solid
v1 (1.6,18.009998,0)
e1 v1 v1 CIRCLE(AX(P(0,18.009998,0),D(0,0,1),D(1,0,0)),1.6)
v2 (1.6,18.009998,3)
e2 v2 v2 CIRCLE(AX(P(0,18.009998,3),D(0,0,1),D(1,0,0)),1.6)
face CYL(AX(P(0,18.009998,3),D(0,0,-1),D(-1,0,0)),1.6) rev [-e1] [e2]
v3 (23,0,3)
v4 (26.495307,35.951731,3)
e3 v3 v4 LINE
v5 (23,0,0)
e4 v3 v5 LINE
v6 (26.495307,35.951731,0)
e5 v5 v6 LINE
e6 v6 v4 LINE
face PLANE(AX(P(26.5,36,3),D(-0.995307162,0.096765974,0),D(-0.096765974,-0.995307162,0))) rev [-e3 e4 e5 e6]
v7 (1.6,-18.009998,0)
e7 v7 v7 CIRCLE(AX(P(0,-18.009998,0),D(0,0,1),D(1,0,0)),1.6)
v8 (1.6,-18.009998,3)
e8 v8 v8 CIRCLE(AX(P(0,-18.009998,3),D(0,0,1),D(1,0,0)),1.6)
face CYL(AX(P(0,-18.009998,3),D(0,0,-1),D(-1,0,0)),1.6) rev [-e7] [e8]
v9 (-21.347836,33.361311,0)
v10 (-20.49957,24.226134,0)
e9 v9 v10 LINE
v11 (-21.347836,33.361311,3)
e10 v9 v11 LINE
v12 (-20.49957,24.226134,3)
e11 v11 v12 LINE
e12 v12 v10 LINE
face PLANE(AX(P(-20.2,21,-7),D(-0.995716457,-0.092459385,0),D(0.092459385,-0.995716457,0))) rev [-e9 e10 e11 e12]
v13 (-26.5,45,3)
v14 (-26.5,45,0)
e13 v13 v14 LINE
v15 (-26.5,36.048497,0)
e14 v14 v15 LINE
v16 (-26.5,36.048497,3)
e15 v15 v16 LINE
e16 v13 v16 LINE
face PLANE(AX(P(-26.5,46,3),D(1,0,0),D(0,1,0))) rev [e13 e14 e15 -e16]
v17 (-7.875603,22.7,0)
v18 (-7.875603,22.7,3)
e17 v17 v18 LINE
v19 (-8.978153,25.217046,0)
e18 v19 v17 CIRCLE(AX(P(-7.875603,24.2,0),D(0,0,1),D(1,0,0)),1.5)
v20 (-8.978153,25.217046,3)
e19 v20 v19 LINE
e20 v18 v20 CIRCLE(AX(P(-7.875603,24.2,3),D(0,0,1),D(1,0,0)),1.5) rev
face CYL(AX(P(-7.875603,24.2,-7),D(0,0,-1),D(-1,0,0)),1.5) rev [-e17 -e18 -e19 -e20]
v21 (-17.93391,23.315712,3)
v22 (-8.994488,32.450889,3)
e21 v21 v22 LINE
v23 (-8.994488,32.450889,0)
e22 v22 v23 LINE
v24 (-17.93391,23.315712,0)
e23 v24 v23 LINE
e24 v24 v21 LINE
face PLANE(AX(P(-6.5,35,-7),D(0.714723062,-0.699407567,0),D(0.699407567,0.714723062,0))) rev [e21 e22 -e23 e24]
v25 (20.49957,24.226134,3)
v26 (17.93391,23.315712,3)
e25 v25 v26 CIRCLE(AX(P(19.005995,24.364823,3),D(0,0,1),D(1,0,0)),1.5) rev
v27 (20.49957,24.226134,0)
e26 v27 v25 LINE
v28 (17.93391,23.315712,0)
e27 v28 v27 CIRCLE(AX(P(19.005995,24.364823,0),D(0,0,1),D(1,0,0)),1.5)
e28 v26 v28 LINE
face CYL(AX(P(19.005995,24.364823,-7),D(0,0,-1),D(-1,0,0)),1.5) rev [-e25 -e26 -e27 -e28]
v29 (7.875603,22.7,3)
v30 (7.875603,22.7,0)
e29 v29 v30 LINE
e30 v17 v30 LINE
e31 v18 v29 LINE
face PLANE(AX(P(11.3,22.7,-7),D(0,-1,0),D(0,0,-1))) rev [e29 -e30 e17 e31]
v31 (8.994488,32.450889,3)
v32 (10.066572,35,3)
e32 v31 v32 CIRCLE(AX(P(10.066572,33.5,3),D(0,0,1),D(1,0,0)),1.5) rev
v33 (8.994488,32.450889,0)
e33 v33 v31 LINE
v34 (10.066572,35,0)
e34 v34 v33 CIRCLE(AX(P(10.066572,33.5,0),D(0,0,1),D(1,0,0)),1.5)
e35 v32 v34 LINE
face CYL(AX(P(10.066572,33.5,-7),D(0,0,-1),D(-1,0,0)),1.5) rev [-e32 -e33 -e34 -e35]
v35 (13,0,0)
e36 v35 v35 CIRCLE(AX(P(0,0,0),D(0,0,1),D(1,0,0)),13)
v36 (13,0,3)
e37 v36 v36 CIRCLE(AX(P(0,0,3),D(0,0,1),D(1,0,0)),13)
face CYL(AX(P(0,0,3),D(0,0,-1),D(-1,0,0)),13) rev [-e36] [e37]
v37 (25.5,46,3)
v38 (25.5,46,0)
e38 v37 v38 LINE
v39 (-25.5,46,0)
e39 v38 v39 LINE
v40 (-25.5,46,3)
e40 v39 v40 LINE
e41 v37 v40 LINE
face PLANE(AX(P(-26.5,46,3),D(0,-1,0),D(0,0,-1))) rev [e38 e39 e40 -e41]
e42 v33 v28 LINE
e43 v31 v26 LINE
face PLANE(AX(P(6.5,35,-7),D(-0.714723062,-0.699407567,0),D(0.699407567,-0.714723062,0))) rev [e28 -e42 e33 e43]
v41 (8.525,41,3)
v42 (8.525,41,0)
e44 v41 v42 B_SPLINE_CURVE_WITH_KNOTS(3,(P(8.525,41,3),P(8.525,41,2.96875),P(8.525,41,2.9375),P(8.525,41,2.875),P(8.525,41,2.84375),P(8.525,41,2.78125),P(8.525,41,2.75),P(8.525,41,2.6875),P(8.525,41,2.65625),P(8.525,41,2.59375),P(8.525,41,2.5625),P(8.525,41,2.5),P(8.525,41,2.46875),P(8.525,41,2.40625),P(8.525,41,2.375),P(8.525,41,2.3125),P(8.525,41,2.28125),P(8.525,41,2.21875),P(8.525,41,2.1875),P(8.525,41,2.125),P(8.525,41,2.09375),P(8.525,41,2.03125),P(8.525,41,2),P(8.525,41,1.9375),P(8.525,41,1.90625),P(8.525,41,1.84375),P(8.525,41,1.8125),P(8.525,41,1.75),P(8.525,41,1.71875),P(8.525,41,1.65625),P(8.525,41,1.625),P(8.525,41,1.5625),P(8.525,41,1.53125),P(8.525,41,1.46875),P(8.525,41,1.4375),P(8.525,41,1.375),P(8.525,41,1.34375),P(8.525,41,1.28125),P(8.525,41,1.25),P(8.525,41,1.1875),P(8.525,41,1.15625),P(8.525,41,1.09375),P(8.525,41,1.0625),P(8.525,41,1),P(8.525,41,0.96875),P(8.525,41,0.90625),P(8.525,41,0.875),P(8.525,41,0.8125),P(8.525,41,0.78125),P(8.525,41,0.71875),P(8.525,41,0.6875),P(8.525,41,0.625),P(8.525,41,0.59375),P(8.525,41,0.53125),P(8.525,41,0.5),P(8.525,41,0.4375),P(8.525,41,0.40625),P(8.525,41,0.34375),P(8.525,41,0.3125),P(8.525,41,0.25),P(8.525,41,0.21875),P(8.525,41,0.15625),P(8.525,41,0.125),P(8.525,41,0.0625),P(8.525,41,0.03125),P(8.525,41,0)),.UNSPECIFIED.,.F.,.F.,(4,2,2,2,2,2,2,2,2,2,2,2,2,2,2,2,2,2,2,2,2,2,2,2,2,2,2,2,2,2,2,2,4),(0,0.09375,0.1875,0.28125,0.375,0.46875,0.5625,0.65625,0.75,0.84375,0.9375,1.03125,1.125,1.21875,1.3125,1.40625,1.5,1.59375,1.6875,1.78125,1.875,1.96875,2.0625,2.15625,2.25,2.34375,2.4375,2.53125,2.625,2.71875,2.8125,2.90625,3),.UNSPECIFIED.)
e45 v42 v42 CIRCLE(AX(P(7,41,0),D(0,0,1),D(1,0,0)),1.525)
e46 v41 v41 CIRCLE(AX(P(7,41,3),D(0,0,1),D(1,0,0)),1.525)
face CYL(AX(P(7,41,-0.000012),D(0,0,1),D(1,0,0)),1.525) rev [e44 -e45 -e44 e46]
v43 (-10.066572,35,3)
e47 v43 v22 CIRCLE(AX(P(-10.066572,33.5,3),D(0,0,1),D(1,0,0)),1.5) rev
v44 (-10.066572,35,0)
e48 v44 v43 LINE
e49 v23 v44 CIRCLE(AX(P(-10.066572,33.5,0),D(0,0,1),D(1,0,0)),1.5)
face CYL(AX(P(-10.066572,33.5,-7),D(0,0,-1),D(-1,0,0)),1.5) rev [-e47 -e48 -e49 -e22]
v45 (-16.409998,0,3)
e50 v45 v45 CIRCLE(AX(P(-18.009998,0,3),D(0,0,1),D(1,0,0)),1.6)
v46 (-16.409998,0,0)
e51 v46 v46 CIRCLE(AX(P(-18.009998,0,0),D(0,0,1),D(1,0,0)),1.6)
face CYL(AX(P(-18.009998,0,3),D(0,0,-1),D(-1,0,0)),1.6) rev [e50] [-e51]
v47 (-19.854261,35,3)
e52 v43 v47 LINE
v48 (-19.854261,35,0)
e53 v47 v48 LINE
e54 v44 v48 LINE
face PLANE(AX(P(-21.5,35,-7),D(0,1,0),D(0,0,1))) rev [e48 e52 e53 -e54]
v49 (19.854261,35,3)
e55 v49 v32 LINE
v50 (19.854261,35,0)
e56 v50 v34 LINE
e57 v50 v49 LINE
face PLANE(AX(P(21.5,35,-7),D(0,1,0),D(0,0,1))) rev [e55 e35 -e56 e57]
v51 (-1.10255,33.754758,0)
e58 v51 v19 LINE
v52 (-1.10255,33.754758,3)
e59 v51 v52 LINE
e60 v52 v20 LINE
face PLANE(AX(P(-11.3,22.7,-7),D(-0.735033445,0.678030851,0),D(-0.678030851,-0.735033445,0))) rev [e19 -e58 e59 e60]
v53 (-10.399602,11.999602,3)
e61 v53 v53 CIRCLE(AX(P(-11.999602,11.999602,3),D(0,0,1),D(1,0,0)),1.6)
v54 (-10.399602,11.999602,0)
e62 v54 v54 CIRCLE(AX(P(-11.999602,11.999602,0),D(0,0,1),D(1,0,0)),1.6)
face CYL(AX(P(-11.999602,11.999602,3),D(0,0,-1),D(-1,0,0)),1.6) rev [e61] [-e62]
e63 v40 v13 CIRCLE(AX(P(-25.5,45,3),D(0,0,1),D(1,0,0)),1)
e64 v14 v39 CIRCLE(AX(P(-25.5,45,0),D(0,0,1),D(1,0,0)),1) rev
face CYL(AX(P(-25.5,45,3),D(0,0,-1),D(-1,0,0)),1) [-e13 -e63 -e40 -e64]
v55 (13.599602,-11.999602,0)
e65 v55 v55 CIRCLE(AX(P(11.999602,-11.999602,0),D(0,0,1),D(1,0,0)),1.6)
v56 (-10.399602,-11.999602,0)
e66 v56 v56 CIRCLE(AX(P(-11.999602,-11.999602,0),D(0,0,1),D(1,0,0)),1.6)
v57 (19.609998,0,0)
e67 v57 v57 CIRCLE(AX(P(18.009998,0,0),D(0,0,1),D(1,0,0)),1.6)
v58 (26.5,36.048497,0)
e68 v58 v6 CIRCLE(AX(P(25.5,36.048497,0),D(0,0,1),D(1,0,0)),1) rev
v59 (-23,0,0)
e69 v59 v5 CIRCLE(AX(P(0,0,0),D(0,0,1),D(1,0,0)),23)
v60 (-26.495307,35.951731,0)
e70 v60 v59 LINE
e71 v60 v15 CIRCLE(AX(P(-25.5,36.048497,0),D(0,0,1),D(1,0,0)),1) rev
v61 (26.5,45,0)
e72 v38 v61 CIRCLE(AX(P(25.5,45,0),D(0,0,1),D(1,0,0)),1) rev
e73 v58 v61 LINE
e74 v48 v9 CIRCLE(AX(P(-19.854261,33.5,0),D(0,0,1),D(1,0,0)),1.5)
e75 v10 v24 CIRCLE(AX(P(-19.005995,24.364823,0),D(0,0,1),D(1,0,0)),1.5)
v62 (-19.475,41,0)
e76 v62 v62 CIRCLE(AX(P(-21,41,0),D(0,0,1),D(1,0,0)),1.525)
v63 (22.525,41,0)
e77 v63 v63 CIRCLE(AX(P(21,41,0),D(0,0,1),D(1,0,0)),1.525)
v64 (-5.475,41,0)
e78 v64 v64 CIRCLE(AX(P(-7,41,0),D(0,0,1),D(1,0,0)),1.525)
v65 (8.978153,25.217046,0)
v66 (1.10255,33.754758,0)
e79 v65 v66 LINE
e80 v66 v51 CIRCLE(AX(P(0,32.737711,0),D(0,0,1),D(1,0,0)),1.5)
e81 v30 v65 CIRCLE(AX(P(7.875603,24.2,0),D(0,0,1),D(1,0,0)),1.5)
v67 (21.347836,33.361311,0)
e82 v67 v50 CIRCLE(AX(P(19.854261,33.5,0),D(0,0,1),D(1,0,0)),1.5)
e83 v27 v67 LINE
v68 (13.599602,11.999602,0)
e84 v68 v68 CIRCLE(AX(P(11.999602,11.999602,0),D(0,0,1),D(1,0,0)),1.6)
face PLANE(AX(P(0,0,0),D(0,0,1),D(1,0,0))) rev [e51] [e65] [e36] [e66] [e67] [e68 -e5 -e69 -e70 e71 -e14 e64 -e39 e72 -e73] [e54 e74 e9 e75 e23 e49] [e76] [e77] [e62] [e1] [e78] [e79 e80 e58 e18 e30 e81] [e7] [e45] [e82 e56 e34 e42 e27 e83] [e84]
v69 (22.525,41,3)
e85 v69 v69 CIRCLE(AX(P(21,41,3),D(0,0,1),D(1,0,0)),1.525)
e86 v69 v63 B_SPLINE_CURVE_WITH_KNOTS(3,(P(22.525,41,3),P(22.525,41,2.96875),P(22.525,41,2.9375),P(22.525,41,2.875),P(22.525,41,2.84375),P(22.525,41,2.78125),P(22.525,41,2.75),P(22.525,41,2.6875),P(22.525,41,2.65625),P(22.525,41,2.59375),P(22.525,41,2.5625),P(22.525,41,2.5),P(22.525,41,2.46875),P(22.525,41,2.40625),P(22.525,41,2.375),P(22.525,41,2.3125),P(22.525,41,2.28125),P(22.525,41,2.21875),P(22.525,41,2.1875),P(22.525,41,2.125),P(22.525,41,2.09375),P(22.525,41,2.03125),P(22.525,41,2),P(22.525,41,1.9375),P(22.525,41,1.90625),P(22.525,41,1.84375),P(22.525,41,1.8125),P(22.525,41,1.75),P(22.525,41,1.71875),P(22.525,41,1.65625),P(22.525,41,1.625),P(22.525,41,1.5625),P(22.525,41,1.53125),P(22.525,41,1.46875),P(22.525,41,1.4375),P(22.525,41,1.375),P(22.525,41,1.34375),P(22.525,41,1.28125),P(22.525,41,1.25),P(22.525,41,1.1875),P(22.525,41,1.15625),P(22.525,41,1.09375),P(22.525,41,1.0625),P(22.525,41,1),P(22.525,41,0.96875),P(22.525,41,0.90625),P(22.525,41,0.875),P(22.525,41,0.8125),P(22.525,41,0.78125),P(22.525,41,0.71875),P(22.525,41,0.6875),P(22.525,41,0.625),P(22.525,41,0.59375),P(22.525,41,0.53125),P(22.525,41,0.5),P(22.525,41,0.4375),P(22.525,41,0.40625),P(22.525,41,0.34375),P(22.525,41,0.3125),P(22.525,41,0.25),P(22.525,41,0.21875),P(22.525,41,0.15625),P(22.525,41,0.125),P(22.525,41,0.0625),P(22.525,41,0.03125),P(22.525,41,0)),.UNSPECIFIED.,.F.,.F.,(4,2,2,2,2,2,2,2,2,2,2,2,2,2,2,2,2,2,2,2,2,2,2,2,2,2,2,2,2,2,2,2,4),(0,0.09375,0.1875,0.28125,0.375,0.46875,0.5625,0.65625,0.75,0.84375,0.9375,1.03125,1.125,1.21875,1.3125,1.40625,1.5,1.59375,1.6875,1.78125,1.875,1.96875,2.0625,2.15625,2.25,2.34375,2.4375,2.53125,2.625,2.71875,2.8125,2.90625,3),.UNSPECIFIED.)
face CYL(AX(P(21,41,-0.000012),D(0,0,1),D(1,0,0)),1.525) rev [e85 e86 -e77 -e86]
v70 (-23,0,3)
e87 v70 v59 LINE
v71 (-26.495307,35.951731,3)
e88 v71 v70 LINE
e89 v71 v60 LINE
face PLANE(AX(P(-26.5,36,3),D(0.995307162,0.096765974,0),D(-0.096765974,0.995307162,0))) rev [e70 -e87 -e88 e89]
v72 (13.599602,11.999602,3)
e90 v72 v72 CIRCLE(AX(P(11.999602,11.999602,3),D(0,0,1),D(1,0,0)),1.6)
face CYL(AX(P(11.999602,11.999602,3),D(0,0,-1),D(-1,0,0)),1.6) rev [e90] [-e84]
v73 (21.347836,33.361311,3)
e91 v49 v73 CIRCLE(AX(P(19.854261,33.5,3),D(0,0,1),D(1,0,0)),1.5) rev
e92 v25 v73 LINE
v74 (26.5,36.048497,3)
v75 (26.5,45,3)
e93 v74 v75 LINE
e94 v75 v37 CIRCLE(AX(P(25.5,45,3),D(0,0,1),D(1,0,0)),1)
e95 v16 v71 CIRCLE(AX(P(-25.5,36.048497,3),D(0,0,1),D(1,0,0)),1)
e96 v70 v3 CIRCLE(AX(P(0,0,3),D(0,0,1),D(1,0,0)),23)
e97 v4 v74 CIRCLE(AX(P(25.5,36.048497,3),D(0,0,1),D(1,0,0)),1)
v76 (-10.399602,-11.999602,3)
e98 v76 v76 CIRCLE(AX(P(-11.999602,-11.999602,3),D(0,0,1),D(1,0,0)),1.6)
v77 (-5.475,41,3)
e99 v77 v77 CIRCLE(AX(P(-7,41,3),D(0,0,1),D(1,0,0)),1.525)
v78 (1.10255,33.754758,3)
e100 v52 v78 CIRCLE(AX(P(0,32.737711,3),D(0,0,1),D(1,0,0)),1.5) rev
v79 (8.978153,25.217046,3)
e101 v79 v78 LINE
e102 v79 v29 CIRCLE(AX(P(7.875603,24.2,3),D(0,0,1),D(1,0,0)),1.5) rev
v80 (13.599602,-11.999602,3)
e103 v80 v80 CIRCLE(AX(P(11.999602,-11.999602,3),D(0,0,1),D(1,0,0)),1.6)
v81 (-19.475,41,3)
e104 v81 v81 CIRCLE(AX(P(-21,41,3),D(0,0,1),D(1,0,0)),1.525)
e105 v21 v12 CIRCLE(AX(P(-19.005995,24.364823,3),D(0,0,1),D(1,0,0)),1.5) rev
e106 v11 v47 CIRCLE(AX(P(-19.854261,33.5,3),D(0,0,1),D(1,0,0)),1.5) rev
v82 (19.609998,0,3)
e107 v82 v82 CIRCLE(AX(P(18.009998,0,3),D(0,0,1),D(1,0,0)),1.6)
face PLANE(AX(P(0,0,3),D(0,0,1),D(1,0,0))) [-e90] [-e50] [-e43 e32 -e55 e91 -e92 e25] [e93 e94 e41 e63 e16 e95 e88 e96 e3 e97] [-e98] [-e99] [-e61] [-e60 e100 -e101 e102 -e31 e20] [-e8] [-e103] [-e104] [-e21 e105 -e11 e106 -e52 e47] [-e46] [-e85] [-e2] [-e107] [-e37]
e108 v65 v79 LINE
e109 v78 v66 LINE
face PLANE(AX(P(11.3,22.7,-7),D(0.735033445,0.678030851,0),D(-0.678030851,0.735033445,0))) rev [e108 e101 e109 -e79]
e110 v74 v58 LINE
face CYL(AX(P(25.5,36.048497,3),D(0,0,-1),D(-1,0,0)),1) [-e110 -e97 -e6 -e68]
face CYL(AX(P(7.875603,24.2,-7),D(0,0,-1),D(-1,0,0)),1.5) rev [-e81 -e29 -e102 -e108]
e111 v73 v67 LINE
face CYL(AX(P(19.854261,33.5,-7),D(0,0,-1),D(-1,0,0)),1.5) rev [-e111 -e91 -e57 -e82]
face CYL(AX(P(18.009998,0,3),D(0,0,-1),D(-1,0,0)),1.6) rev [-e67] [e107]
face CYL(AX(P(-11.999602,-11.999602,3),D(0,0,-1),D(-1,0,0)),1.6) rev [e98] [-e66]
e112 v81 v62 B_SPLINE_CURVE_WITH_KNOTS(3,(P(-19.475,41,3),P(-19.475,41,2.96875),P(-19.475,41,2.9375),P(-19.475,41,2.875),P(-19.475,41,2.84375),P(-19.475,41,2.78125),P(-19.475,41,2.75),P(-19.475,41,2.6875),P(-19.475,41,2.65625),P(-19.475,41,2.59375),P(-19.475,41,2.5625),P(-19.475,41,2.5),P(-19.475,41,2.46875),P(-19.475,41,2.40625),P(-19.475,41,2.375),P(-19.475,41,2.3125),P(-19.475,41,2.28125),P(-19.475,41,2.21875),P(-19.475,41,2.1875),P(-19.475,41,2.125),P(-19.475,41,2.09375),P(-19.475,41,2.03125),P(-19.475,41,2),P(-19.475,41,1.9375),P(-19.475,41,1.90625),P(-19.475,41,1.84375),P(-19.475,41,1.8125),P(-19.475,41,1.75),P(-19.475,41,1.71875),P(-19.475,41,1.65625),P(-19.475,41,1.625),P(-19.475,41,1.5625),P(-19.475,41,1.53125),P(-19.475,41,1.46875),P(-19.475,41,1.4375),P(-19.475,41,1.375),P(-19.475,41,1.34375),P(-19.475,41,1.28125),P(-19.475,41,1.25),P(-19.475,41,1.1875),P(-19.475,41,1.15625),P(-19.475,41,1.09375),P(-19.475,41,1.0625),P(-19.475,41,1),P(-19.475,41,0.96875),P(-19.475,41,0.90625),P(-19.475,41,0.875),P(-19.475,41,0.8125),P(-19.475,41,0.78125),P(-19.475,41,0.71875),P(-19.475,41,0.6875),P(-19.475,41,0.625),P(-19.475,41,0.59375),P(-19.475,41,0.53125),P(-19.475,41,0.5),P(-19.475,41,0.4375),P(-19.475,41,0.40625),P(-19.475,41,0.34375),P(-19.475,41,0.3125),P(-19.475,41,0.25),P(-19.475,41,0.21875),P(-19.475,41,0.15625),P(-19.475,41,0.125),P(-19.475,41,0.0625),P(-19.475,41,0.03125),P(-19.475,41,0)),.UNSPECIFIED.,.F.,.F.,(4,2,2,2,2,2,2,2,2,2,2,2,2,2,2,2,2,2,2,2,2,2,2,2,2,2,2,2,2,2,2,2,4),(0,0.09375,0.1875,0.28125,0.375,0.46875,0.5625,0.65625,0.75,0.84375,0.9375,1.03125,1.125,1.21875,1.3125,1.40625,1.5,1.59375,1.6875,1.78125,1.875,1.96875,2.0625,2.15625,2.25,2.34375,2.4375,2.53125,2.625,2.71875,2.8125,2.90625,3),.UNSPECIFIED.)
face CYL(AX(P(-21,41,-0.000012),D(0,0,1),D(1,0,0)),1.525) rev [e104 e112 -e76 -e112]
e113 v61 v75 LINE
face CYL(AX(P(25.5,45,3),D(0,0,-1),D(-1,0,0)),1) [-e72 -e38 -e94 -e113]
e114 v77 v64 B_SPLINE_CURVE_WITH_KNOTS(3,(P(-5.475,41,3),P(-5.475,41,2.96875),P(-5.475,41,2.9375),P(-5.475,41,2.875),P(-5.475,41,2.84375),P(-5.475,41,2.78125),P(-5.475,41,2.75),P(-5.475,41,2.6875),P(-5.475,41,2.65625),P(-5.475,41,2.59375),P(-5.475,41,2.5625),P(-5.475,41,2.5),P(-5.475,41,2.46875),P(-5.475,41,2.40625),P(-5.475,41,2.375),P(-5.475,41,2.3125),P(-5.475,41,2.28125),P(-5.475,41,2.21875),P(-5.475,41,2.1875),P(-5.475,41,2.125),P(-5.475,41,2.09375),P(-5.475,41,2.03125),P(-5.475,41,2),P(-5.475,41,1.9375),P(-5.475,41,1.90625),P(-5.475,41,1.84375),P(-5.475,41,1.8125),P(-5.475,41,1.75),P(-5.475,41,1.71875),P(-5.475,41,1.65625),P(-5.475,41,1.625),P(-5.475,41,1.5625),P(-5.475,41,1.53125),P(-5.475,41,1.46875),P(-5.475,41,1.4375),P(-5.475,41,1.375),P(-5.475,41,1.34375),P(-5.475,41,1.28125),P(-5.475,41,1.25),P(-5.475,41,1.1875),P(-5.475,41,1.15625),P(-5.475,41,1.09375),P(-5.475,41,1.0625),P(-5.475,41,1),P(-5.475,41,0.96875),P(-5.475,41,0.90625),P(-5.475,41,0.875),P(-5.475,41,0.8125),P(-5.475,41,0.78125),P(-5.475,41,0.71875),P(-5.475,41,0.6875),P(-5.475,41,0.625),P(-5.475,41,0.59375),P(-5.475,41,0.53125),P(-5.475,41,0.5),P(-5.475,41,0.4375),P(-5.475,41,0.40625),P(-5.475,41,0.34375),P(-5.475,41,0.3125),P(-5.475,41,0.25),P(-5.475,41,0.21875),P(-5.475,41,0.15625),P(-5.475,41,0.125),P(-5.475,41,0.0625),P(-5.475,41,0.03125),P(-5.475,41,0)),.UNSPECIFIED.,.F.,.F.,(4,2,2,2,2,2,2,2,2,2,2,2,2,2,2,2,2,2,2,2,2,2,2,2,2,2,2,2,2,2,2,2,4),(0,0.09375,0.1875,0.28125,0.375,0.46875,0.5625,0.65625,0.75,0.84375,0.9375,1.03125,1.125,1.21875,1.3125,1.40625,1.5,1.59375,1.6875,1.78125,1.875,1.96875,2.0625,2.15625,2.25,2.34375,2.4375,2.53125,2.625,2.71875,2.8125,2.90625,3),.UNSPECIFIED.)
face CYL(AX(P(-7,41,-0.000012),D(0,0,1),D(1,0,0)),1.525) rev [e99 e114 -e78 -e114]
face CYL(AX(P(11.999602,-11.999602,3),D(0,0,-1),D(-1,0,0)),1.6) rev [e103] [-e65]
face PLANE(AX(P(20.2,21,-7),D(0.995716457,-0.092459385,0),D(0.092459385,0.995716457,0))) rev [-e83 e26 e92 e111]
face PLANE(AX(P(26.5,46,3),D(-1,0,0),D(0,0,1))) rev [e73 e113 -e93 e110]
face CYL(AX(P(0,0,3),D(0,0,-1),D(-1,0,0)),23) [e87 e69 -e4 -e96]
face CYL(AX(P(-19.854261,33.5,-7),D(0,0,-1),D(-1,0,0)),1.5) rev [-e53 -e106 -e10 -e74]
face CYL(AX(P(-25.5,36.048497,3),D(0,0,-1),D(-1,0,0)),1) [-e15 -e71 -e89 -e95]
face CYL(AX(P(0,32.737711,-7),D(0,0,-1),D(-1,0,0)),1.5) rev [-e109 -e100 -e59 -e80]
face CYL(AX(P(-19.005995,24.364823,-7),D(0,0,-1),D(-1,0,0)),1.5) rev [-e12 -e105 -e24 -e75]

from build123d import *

# Parameters (mm, degrees)
EXTRUDE_2_DEPTH          = 3
FILLET_3_R               = 1
SKETCH_3_R               = 13
SKETCH_3_R_2             = 1.6
CUT_EXTRUDE_5_DEPTH      = 3
CUT_EXTRUDE_6_DEPTH      = 54.17189107
CUT_EXTRUDE_6_DEPTH_BACK = 54.17189107
SKETCH_4_R               = 1.525
CUT_EXTRUDE_7_DEPTH      = 10
FILLET_4_R               = 1.5


with BuildPart() as part:
    # 草圖2 → 填料-伸長2 (new body)
    with BuildSketch(Plane.XY):
        with BuildLine():
            Line((-26.5, 46), (26.5, 46))
            Line((26.5, 46), (26.5, 36))
            Line((26.5, 36), (23, 0))
            ThreePointArc((23, 0), (0, -23), (-23, 0))
            Line((-23, 0), (-26.5, 36))
            Line((-26.5, 36), (-26.5, 46))
        make_face()
    extrude(amount=EXTRUDE_2_DEPTH)

    # 圓角3
    # the kernel refuses this fillet: 1 mm, written as the material it takes off along each edge
    with BuildSketch(Plane(origin=(-26.5, 46, -2.5), x_dir=(0, -1, 0), z_dir=(0, 0, 1)), Plane(origin=(26.5, 46, -2.5), x_dir=(-1, 0, 0), z_dir=(0, 0, 1))) as fillet_3_piece_1:
        with BuildLine():
            CenterArc((FILLET_3_R, FILLET_3_R), FILLET_3_R, 180, 90)
            Line((0, FILLET_3_R), (0, 0))
            Line((0, 0), (FILLET_3_R, 0))
        make_face()
    extrude(amount=8, mode=Mode.SUBTRACT)
    with BuildSketch(Plane(origin=(26.5, 36, -0.121241952), x_dir=(0, 1, 0), z_dir=(0, 0, 1)), Plane(origin=(-26.5, 36, -0.121241952), x_dir=(0.0967659740606196, -0.9953071617667079, 0), z_dir=(0, 0, 1))) as fillet_3_piece_2:
        with BuildLine():
            CenterArc((FILLET_3_R * 0.0484967808039, FILLET_3_R), FILLET_3_R, 264.447028967, 5.552971033)
            Line((-FILLET_3_R * 0.0482691932568, FILLET_3_R * 0.0046928382333), (0, 0))
            Line((0, 0), (FILLET_3_R * 0.0484967808039, 0))
        make_face()
    extrude(amount=3.242483904, mode=Mode.SUBTRACT)

    # 草圖3 → 除料-伸長5 (cut)
    with BuildSketch(Plane.XY):
        Circle(SKETCH_3_R)
        with Locations((18.009998301, 0)):
            Circle(SKETCH_3_R_2)
        with Locations((0, -18.009998301)):
            Circle(SKETCH_3_R_2)
        with Locations((-18.009998301, 0)):
            Circle(SKETCH_3_R_2)
        with Locations((0, 18.009998301)):
            Circle(SKETCH_3_R_2)
        with Locations((11.999602077, 11.999602077)):
            Circle(SKETCH_3_R_2)
        with Locations((11.999602077, -11.999602077)):
            Circle(SKETCH_3_R_2)
        with Locations((-11.999602077, -11.999602077)):
            Circle(SKETCH_3_R_2)
        with Locations((-11.999602077, 11.999602077)):
            Circle(SKETCH_3_R_2)
    extrude(amount=CUT_EXTRUDE_5_DEPTH, mode=Mode.SUBTRACT)

    # 草圖4 → 除料-伸長6 (cut, two sides: drawn at the far end of the back side and taken through both)
    with BuildSketch(Plane.XY.offset(-CUT_EXTRUDE_6_DEPTH_BACK)):
        with Locations((21, 41)):
            Circle(SKETCH_4_R)
        with Locations((7, 41)):
            Circle(SKETCH_4_R)
        with Locations((-7, 41)):
            Circle(SKETCH_4_R)
        with Locations((-21, 41)):
            Circle(SKETCH_4_R)
    extrude(amount=CUT_EXTRUDE_6_DEPTH + CUT_EXTRUDE_6_DEPTH_BACK, mode=Mode.SUBTRACT)

    # 草圖5 → 除料-伸長7 (cut)
    with BuildSketch(Plane.XY.offset(3)):
        Polygon((-21.5, 35), (-6.5, 35), (-20.2, 21), align=None)
        Polygon((11.3, 22.7), (-11.3, 22.7), (0, 34.95), align=None)
        Polygon((6.5, 35), (20.2, 21), (21.5, 35), align=None)
    extrude(amount=-CUT_EXTRUDE_7_DEPTH, mode=Mode.SUBTRACT)

    # 圓角4
    fillet_4_edges = [part.edges().sort_by_distance(p)[0] for p in [
        (6.5, 35, 1.5),
        (21.5, 35, 1.5),
        (20.2, 21, 1.5),
        (-11.3, 22.7, 1.5),
        (0, 34.95, 1.5),
        (11.3, 22.7, 1.5),
        (-20.2, 21, 1.5),
        (-21.5, 35, 1.5),
        (-6.5, 35, 1.5),
    ]]
    fillet(fillet_4_edges, radius=FILLET_4_R)


solid = part.part
